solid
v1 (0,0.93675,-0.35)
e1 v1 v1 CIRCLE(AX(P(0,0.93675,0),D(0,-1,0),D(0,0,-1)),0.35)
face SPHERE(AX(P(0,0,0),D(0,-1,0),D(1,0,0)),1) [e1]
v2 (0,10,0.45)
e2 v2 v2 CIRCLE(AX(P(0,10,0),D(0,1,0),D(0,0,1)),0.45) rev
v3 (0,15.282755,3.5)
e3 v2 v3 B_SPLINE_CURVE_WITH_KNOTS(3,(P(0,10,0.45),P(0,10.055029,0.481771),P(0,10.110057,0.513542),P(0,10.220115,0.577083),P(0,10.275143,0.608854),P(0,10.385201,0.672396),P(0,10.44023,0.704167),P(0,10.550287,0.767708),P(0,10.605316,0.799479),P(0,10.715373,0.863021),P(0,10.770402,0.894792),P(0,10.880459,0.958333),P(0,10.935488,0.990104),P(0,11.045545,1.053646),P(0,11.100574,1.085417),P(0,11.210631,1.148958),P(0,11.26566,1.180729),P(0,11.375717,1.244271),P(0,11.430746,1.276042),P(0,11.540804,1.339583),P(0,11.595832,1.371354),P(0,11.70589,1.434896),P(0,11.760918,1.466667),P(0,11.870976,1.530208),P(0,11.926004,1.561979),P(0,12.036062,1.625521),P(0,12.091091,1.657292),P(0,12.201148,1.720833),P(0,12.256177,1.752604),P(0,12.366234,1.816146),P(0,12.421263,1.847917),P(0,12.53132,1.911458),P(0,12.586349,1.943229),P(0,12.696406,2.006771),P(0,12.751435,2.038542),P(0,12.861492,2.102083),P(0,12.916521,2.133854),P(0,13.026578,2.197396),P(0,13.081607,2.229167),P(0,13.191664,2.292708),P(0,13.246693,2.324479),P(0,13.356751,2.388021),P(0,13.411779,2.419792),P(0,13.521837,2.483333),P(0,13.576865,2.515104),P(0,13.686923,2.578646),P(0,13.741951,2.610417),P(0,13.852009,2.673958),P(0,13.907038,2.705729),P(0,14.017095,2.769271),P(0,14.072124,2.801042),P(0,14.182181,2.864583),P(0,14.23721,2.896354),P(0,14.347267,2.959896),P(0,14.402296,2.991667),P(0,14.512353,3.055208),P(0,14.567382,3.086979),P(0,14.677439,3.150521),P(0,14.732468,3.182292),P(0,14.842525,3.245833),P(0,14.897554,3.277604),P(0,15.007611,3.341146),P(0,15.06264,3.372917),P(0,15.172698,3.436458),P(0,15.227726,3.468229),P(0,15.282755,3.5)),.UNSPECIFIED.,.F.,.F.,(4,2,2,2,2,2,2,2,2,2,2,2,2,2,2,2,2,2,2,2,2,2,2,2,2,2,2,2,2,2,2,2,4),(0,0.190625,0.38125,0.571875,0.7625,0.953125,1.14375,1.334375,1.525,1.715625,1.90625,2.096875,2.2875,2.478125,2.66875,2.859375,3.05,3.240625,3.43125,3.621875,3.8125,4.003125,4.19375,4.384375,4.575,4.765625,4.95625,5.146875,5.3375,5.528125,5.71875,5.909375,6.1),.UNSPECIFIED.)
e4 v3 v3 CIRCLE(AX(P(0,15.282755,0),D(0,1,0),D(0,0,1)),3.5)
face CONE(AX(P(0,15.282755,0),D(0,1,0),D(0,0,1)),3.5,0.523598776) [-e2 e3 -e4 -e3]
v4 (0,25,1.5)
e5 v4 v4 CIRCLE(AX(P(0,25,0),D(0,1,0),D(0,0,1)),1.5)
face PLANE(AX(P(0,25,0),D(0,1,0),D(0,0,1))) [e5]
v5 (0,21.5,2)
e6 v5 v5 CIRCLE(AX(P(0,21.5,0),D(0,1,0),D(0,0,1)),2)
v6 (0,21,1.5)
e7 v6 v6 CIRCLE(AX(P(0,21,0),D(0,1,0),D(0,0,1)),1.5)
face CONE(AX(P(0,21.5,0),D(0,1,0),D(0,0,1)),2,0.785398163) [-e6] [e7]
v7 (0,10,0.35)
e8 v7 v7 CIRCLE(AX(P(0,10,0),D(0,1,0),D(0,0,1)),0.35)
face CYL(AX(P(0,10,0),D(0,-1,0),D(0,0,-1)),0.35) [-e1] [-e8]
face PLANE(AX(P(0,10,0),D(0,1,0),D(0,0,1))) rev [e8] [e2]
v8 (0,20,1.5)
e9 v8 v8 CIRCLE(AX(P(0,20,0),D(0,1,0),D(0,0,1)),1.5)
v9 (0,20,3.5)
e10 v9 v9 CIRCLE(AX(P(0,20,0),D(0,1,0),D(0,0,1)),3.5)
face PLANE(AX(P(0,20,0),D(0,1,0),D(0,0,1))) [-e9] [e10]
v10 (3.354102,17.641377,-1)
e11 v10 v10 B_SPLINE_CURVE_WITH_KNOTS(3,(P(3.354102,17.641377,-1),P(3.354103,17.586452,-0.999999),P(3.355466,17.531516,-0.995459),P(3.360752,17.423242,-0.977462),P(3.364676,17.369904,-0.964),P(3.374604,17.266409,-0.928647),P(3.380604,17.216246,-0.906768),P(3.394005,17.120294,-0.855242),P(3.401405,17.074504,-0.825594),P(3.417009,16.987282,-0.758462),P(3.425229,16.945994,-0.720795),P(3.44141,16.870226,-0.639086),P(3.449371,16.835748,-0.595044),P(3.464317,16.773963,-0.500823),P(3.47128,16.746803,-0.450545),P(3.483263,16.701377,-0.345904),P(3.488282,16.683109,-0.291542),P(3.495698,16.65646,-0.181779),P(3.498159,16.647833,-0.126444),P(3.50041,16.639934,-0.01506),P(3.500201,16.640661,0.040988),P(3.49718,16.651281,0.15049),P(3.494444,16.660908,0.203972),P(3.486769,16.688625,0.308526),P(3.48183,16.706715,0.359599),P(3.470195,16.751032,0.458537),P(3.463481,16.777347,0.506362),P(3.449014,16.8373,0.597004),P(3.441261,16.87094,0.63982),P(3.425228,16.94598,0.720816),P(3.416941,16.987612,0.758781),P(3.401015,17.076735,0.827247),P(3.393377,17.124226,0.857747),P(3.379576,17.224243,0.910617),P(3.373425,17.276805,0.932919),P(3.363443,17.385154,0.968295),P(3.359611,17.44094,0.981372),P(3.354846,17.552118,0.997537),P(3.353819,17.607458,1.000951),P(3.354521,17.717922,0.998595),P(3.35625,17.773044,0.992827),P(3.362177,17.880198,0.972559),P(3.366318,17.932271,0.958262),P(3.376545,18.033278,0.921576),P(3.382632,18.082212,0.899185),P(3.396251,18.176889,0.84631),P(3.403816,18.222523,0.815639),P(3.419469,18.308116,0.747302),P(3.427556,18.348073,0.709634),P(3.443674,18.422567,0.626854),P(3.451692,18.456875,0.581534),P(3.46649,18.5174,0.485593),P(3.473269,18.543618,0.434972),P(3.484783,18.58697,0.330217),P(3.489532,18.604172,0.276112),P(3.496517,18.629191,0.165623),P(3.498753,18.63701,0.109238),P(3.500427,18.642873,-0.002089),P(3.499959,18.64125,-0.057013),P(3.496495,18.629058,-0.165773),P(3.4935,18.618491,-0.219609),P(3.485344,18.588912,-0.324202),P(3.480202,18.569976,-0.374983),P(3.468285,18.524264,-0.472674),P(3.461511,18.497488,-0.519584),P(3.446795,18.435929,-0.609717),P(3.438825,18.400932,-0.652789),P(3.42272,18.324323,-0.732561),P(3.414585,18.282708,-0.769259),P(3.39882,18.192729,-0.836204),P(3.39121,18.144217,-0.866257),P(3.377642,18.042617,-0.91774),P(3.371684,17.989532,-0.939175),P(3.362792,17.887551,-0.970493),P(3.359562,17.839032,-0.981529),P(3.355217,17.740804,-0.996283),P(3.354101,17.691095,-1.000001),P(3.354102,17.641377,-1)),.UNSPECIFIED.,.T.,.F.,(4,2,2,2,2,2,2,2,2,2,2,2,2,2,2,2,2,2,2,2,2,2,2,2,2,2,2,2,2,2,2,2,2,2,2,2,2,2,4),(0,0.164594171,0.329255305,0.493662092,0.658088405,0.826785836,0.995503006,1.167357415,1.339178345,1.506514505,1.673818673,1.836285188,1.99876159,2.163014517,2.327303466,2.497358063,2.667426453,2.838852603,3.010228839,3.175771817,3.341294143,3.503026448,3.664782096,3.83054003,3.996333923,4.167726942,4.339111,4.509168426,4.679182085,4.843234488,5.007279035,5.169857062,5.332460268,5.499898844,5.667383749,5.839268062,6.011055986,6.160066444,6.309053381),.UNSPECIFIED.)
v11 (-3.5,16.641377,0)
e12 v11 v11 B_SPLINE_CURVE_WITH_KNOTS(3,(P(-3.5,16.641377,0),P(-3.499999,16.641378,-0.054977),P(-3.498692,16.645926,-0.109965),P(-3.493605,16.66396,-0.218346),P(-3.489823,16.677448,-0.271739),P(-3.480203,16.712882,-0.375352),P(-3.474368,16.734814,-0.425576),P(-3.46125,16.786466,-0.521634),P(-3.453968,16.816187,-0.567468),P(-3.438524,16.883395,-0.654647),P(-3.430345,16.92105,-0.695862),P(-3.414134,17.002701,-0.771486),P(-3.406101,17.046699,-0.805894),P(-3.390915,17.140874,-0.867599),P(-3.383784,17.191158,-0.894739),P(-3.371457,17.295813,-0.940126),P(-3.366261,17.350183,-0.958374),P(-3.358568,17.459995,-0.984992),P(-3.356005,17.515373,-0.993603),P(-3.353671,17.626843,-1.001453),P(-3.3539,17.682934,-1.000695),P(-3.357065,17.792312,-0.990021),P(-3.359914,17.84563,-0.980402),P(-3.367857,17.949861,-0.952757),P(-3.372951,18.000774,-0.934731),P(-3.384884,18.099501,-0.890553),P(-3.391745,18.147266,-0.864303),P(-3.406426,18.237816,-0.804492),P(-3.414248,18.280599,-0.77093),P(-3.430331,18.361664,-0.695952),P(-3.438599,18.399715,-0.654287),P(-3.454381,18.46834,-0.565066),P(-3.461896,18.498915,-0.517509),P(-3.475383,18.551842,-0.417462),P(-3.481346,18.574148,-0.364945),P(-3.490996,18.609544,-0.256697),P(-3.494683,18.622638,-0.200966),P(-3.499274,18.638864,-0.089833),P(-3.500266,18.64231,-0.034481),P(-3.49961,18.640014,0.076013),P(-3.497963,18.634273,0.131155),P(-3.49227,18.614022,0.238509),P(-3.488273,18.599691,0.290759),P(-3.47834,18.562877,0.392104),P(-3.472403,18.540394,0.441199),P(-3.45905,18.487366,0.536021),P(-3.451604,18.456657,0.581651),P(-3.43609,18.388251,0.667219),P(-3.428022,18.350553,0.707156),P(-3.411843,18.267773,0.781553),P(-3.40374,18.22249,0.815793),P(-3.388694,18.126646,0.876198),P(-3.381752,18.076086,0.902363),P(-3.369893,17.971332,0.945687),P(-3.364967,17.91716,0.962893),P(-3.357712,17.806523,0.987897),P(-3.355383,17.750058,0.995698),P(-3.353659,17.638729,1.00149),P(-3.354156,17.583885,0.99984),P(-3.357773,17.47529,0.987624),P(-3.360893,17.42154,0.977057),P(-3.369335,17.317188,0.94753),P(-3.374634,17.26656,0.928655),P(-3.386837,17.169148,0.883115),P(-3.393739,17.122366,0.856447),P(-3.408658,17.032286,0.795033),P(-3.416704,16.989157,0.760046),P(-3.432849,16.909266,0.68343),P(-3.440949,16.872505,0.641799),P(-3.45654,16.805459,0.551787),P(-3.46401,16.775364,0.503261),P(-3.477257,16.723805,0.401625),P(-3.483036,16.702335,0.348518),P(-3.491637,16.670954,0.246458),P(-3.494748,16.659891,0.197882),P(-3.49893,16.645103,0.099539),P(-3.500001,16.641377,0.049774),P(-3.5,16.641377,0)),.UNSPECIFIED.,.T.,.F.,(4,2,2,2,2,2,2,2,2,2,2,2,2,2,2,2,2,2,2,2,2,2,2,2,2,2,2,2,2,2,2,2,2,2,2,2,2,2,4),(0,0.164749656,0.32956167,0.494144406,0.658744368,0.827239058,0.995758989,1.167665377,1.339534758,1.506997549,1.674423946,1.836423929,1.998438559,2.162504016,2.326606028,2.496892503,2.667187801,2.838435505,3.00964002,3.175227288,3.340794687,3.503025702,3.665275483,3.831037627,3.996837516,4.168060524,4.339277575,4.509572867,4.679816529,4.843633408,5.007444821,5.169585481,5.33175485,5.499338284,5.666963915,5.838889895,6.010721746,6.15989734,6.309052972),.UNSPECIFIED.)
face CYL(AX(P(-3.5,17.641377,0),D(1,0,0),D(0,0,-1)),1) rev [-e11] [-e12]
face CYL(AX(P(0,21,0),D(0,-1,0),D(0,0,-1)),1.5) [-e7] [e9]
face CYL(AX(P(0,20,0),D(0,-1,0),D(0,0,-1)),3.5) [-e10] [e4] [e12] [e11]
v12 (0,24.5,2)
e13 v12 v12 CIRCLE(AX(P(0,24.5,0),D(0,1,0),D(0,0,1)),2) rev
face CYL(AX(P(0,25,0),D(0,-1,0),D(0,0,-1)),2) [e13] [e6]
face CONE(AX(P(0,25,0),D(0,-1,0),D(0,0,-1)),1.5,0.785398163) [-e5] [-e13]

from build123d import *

# Parameters (mm, degrees)
SKETCH2_R               = 0.35
BOSS_EXTRUDE2_DEPTH     = 10
SKETCH4_R               = 3.5
BOSS_EXTRUDE3_DEPTH     = 10
CHAMFER1_SIZE           = 3.05
CHAMFER1_SIZE2          = 5.282754963
CUT_EXTRUDE4_DEPTH      = 21.603397778
CUT_EXTRUDE4_DEPTH_BACK = 21.603397778
SKETCH5_R               = 1
SKETCH6_R               = 1.5
BOSS_EXTRUDE4_DEPTH     = 1
SKETCH7_R               = 2
BOSS_EXTRUDE5_DEPTH     = 4
CHAMFER2_SIZE           = 0.5


with BuildPart() as part:
    # Sketch1 → Revolve1 (revolve)
    with BuildSketch(Plane.XY):
        with BuildLine():
            Line((0, 0), (0, -1))
            ThreePointArc((0, -1), (1, 0), (0, 1))
            Line((0, 1), (0, 0))
        make_face()
    revolve(axis=Axis((0, 0, 0), (0, 1, 0)))

    # Sketch2 → Boss-Extrude2 (add)
    with BuildSketch(Plane(origin=(0, 0, 0), x_dir=(1, 0, 0), z_dir=(0, 1, 0))):
        with Locations(Location((0, 0, 0), (0, 0, 90))):
            Circle(SKETCH2_R)
    extrude(amount=BOSS_EXTRUDE2_DEPTH)

    # Sketch4 → Boss-Extrude3 (add)
    with BuildSketch(Plane(origin=(0, 10, 0), x_dir=(1, 0, 0), z_dir=(0, 1, 0))):
        with Locations(Location((0, 0, 0), (0, 0, 270))):
            Circle(SKETCH4_R)
    extrude(amount=BOSS_EXTRUDE3_DEPTH)

    # Chamfer1
    chamfer1_edges = [part.edges().sort_by_distance(p)[0] for p in [
        (0, 10, -3.5),
    ]]
    chamfer1_side = [part.faces().sort_by_distance(p)[0] for p in [
        (0, 10, -3.401005051),
    ]]
    chamfer(chamfer1_edges, length=CHAMFER1_SIZE, length2=CHAMFER1_SIZE2, reference=chamfer1_side[0])

    # Sketch5 → Cut-Extrude4 (cut, two sides: drawn at the far end of the back side and taken through both)
    with BuildSketch(Plane(origin=(0, 0, 0), x_dir=(0, 0, -1), z_dir=(1, 0, 0)).offset(-CUT_EXTRUDE4_DEPTH_BACK)):
        with Locations((0, 17.641377482)):
            Circle(SKETCH5_R)
    extrude(amount=CUT_EXTRUDE4_DEPTH + CUT_EXTRUDE4_DEPTH_BACK, mode=Mode.SUBTRACT)

    # Sketch6 → Boss-Extrude4 (add)
    with BuildSketch(Plane(origin=(0, 20, 0), x_dir=(1, 0, 0), z_dir=(0, 1, 0))):
        with Locations(Location((0, 0, 0), (0, 0, 270))):
            Circle(SKETCH6_R)
    extrude(amount=BOSS_EXTRUDE4_DEPTH)

    # Sketch7 → Boss-Extrude5 (add)
    with BuildSketch(Plane(origin=(0, 21, 0), x_dir=(1, 0, 0), z_dir=(0, 1, 0))):
        with Locations(Location((0, 0, 0), (0, 0, 270))):
            Circle(SKETCH7_R)
    extrude(amount=BOSS_EXTRUDE5_DEPTH)

    # Chamfer2
    chamfer2_edges = [part.edges().sort_by_distance(p)[0] for p in [
        (0, 21, -2),
        (0, 25, -2),
    ]]
    chamfer(chamfer2_edges, length=CHAMFER2_SIZE - 0.0001)  # a hair under: the kernel refuses the full size


solid = part.part
